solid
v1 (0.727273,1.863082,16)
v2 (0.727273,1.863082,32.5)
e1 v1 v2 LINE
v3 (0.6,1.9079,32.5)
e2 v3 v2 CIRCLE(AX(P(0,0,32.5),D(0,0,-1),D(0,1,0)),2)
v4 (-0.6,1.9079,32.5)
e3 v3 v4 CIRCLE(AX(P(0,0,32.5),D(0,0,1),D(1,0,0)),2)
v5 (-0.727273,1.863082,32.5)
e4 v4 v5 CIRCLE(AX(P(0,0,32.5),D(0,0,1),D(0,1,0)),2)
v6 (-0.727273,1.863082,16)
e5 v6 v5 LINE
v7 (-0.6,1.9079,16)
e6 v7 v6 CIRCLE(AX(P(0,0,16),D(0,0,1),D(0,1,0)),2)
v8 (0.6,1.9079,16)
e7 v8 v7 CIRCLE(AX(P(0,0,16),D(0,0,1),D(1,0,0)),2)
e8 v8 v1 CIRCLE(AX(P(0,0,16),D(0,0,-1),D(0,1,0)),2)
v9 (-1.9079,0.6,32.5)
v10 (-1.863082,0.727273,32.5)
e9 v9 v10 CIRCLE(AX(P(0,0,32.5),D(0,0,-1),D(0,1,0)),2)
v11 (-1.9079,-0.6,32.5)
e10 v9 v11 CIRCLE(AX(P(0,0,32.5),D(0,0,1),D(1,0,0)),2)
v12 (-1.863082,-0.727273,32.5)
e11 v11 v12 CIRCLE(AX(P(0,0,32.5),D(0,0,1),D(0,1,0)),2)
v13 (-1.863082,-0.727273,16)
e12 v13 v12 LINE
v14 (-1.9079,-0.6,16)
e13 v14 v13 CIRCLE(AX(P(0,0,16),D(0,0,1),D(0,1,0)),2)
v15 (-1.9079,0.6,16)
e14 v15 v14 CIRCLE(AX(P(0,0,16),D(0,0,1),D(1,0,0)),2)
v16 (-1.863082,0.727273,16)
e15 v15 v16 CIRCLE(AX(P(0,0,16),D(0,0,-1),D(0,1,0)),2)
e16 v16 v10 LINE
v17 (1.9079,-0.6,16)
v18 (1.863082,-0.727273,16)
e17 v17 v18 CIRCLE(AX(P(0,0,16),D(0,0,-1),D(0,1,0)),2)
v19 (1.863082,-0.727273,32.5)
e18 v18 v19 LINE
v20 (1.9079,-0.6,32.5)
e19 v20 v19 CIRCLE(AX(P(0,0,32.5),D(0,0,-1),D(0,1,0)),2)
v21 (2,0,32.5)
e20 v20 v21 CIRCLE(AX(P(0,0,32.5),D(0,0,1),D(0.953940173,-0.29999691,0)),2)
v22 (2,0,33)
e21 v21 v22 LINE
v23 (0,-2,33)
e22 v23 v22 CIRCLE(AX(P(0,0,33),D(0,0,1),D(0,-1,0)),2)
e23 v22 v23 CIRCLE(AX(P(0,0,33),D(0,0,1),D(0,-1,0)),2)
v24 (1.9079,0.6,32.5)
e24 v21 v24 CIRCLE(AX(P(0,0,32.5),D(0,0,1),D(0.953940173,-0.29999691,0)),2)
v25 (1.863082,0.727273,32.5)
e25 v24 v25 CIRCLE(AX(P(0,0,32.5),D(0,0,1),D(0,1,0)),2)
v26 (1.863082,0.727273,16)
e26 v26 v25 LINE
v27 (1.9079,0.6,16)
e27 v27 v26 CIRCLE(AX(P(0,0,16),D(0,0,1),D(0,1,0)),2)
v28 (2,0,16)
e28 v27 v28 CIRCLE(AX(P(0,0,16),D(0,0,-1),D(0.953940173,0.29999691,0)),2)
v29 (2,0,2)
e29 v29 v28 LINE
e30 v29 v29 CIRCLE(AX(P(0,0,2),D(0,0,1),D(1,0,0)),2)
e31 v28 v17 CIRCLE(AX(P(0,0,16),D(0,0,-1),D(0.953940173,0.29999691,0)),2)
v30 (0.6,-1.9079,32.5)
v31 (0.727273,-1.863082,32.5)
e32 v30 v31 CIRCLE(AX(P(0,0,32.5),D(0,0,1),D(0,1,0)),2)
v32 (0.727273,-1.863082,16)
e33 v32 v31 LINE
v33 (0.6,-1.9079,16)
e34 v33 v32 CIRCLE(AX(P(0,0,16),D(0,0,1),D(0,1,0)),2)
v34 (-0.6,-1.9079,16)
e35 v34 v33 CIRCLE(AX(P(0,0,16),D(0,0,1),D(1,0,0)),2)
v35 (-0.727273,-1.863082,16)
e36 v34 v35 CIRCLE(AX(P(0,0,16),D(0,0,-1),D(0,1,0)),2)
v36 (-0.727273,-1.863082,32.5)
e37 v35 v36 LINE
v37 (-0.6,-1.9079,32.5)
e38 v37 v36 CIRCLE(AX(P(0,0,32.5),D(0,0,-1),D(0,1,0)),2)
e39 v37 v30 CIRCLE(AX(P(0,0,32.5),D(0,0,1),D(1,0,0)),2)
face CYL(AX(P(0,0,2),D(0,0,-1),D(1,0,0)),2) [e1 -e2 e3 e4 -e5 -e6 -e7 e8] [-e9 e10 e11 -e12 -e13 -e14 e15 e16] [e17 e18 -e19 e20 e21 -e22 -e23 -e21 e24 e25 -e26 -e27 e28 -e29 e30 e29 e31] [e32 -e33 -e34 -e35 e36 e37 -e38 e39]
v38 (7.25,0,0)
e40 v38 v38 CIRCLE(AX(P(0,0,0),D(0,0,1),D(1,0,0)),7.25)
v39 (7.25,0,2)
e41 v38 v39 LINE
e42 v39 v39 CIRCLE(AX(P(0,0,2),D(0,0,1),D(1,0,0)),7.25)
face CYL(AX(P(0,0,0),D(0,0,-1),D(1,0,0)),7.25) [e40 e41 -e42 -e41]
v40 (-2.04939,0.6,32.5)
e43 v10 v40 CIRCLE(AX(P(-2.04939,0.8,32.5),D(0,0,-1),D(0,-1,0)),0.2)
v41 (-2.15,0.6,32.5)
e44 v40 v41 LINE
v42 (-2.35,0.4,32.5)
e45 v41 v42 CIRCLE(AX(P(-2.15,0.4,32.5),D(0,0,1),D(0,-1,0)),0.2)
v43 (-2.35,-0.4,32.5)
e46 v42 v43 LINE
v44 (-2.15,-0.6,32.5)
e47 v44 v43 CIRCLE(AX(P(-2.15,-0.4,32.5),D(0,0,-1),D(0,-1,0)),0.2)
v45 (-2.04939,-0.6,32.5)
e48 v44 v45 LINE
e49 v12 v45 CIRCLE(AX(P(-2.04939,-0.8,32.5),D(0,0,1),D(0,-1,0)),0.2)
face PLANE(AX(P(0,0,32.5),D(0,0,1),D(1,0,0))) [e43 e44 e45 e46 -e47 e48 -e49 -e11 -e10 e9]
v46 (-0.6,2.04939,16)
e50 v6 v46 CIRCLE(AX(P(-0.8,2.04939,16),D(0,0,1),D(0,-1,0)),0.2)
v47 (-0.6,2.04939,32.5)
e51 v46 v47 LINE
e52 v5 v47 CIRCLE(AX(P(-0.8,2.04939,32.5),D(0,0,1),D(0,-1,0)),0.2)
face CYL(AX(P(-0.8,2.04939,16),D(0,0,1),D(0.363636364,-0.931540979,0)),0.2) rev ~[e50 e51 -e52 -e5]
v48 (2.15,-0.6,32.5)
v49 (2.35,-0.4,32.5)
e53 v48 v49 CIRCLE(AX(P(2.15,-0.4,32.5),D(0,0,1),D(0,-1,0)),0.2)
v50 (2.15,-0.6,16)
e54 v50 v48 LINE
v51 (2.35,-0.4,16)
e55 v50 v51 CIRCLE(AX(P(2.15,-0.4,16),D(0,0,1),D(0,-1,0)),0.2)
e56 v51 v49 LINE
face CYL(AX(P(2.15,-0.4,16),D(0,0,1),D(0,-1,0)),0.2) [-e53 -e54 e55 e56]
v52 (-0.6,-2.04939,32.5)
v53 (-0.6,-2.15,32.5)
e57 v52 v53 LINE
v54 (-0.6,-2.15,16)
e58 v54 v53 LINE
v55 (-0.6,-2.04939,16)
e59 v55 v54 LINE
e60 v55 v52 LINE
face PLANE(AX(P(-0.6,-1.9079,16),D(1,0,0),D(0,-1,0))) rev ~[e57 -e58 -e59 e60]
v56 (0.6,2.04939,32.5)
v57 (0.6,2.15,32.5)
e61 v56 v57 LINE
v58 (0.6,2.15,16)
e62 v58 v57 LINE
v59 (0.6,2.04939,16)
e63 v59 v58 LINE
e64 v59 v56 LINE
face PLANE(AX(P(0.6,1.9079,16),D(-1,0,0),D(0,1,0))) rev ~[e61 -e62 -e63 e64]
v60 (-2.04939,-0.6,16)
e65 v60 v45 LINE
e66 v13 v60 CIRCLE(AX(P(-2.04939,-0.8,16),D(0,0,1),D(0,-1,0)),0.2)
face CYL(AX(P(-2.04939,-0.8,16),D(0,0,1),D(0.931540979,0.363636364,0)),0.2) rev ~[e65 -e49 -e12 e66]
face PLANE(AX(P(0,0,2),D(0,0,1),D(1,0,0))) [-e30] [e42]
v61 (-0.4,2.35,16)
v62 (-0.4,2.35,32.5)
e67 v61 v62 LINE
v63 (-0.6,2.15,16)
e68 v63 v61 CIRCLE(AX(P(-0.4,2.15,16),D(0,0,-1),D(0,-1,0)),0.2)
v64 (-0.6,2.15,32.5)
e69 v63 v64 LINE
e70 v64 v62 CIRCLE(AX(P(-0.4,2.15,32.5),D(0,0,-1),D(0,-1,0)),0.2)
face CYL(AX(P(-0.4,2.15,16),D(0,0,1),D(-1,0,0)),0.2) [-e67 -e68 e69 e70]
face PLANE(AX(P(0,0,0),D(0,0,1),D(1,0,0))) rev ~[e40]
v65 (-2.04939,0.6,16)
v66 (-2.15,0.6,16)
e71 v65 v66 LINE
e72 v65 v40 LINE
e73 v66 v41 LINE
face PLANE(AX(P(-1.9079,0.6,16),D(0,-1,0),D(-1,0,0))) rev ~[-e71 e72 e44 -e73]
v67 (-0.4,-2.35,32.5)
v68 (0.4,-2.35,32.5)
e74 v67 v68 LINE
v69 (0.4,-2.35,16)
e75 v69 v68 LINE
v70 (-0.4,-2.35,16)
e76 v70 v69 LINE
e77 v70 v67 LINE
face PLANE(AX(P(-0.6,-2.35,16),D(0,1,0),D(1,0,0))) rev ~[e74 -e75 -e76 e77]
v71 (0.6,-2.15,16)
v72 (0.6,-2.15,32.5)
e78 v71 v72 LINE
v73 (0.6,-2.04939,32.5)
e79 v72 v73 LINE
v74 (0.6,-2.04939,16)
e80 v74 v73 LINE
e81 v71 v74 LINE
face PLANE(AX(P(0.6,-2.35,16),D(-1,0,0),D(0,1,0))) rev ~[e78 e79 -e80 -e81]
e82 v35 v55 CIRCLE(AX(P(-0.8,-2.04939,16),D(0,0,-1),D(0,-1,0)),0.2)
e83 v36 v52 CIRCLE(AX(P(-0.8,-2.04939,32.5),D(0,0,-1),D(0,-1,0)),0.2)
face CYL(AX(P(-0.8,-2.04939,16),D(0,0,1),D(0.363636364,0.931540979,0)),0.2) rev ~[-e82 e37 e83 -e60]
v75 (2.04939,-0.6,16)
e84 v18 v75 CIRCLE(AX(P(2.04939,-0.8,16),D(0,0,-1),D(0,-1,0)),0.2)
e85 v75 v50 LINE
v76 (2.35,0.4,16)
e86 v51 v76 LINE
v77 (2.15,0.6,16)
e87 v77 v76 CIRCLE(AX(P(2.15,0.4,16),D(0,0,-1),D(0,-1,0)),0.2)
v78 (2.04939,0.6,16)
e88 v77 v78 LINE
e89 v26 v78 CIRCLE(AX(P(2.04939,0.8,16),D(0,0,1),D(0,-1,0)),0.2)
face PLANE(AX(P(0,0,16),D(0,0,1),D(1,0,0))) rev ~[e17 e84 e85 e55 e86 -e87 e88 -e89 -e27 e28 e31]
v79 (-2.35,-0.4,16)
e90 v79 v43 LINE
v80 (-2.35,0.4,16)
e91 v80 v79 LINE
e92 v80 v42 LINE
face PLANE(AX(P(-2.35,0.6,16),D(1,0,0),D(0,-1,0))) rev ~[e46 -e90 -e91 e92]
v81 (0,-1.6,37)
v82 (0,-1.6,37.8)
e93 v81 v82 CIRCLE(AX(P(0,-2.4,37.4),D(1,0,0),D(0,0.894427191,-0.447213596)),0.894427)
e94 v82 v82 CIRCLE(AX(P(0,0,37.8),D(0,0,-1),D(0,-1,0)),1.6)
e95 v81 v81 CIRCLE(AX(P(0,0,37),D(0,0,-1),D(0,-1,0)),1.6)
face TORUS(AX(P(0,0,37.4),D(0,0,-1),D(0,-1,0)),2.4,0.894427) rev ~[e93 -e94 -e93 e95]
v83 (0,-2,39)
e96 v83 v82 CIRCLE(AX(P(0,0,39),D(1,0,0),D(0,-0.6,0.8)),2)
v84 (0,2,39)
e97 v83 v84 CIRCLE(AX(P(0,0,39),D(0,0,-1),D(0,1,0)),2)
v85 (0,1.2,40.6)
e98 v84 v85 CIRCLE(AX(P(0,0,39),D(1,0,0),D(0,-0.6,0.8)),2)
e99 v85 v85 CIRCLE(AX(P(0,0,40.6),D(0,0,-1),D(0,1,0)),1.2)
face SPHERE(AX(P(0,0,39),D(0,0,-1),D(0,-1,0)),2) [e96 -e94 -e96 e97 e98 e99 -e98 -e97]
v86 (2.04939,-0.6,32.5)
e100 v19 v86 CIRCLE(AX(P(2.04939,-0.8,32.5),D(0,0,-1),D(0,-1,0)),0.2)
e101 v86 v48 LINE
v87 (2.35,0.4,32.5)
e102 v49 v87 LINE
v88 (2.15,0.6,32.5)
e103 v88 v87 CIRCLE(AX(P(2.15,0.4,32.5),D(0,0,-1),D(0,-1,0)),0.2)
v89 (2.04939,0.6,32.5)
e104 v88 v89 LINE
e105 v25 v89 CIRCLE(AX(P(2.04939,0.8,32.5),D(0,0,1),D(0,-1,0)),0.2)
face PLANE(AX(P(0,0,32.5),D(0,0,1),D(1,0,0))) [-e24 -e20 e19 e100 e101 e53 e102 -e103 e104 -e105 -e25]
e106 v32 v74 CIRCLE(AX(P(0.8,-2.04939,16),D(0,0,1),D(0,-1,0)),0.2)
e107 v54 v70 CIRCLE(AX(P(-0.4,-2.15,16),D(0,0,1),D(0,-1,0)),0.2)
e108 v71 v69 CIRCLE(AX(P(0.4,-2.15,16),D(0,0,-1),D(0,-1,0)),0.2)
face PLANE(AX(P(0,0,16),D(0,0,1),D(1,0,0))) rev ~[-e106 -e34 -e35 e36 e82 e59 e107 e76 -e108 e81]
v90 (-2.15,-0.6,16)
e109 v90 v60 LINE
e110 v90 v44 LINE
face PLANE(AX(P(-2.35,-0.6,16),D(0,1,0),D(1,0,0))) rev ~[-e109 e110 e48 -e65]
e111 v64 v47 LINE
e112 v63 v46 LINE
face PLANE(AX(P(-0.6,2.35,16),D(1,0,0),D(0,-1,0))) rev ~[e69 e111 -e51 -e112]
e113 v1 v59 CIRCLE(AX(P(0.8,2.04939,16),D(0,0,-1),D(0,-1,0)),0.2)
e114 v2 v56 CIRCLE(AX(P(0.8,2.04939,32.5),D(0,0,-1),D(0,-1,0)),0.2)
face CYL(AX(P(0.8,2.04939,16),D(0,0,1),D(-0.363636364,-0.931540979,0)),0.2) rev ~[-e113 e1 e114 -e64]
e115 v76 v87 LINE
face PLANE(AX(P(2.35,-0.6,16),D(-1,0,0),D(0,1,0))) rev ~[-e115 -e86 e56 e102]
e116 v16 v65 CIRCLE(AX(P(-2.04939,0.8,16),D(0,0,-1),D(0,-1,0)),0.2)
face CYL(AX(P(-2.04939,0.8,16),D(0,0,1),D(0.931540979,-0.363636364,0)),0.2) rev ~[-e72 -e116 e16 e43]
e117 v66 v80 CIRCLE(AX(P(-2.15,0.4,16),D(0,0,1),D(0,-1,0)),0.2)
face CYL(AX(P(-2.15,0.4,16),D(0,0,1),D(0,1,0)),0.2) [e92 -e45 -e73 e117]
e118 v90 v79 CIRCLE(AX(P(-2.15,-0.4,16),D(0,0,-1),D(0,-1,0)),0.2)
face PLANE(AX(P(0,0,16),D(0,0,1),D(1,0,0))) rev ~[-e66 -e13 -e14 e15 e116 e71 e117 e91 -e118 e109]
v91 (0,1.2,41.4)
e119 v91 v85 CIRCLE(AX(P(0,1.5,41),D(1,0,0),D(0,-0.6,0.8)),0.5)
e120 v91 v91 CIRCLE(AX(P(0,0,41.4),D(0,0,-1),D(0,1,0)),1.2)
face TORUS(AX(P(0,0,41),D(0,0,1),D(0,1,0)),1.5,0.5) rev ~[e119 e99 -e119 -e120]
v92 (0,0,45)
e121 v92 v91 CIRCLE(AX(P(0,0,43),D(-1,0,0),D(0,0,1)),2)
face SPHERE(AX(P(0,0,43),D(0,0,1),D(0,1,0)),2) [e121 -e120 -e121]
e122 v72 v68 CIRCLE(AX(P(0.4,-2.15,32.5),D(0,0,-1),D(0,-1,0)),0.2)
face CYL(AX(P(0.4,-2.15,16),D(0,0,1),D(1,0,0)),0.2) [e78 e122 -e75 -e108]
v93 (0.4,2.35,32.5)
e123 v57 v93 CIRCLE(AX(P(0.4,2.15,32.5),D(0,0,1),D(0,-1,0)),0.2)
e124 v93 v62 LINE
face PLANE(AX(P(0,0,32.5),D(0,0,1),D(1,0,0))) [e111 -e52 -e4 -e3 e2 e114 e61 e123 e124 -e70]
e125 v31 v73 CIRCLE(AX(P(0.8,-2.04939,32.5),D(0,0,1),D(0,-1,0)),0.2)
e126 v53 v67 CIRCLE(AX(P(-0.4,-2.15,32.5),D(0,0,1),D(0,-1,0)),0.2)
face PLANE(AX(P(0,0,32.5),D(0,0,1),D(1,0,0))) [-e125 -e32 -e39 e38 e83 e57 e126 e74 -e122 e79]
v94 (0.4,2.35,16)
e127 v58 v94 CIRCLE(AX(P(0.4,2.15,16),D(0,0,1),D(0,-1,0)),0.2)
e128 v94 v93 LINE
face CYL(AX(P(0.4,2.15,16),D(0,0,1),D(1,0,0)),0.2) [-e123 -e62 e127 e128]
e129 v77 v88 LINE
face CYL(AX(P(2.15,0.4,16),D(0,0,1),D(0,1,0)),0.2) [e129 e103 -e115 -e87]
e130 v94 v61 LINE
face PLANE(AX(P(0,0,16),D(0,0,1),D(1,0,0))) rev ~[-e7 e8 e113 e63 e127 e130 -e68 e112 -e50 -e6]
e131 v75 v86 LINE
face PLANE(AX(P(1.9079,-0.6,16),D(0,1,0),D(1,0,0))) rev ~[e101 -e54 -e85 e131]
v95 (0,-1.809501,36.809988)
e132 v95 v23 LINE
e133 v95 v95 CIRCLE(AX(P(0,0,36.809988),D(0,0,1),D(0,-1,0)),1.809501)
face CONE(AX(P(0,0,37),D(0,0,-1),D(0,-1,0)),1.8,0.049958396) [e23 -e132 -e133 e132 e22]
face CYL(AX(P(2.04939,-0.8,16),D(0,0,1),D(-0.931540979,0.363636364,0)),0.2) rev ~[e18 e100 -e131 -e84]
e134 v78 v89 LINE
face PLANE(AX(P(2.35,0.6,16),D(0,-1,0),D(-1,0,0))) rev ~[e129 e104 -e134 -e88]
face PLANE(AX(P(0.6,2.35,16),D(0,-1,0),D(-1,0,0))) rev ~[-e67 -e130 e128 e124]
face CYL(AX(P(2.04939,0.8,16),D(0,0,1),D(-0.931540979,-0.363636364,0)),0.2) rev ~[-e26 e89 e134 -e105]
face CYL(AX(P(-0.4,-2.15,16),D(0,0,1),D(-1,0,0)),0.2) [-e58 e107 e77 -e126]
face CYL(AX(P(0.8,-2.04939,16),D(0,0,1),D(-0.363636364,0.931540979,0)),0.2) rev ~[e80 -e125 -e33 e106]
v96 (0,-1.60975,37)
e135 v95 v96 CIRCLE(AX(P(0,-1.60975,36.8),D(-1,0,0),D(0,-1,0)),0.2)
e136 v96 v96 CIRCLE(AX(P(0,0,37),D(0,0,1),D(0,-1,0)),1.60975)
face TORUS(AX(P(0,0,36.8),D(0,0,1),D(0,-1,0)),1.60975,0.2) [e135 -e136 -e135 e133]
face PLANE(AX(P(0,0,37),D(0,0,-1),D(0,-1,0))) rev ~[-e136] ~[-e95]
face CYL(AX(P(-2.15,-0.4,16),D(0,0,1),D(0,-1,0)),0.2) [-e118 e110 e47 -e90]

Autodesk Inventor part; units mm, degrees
ref_plane "YZ Plane" through (0, 0, 0) normal (1, 0, 0) x (0, 1, 0)
ref_plane "XZ Plane" through (0, 0, 0) normal (0, 1, 0) x (-1, 0, 0)
sketch "Boceto1" plane through (0, 0, 0) normal (0, 0, 1) x (1, 0, 0)
  circle A0 centre (0, 0) radius 7.25
  dimension "d0" = 14.5
extrude "Extrusión1" add sketch "Boceto1" along normal blind 2
sketch "Boceto2" plane through (0, 0, 2) normal (0, 0, 1) x (1, 0, 0)
  circle A0 centre (0, 0) radius 2
  dimension "d3" = 4
extrude "Extrusión2" add sketch "Boceto2" along normal blind 43
sketch "Boceto3" plane through (0, 0, 0) normal (1, 0, 0) x (0, 1, 0)
  line L0 (2, 45) -> (-2, 45) projected
  line L1 (-2, 2) -> (2, 2) projected
  line L2 (-2, 2) -> (-2, 45) projected
  line L3 (2, 45) -> (-2, 45)
  line L4 (-2, 45) -> (-2, 41)
  line L5 (2, 41) -> (2, 45)
  arc A0 (1.2, 41.4) -> (-1.2, 41.4) centre (0, 43) ccw
  line L6 (-2, 41) -> (-2, 37)
  line L7 (-1.8, 37) -> (1.8, 37)
  line L8 (2, 37) -> (2, 41)
  arc A1 (-1.2, 40.6) -> (1.2, 40.6) centre (0, 39) ccw
  line L9 (0, 45) -> (0, 0)
  arc A2 (1.2, 41.4) -> (1.2, 40.6) centre (1.5, 41) ccw
  arc A3 (-1.2, 40.6) -> (-1.2, 41.4) centre (-1.5, 41) ccw
  line L10 (2, 45) -> (-2, 45)
  line L11 (-2, 45) -> (-2, 37)
  line L12 (-1.8, 37) -> (1.8, 37)
  line L13 (2, 37) -> (2, 45)
  line L14 (1.8, 37) -> (1, 37)
  line L15 (-1.8, 37) -> (-1, 37)
  line L16 (0, 37) -> (1.6, 37)
  line L17 (2, 37) -> (2, 33)
  line L18 (0, 37) -> (1.8, 37)
  line L19 (1.8, 37) -> (2, 33)
  line L20 (0, 37) -> (-1.8, 37)
  line L21 (-1.8, 37) -> (-2, 33)
  arc A4 (1.6, 37.8) -> (1.6, 37) centre (2.4, 37.4) ccw
  arc A5 (-1.6, 37) -> (-1.6, 37.8) centre (-2.4, 37.4) ccw
  point P0 (-1.6, 37.8)
  point P1 (-2, 39)
  point P2 (2, 39)
  point P3 (2, 43)
  point P4 (0, 45)
  point P5 (-2, 43)
  dimension "d12" = 1.6
  dimension "d13" = 4
  dimension "d14" = 1.8
  dimension "d15" = 1.8
revolve "Revolución1" cut sketch "Boceto3" angle 360 about axis through (0, 0, 45) along (0, 0, -1) contours L5 A0 L0 | A0 L2 L0 | L5 L8 A1 A2 A0 | A0 A3 A1 L2 | A5 L7 L21 L2 A1 | A1 L8 L17 L19 L7 A4
fillet "Empalme1" radius 0.2 1 edges at (0, 1.8, 37)
ref_plane "Plano de trabajo1" through (0, 0, 16) normal (0, 0, 1) x (1, 0, 0)
sketch "Boceto4" plane through (0, 0, 16) normal (0, 0, 1) x (1, 0, 0)
  circle A0 centre (0, 0) radius 2 projected
  line L0 (0.6, 1.9079) -> (0.6, 2.35)
  line L1 (0.6, 2.35) -> (-0.6, 2.35)
  line L2 (-0.6, 2.35) -> (-0.6, 1.9079)
  line L3 (0, 2) -> (0.6, 2.35) construction
  line L4 (0, 2) -> (-0.6, 2.35) construction
  arc A1 (0.6, 1.9079) -> (-0.6, 1.9079) centre (0, 0) ccw
  line L5 (-2.35, 0.6) -> (-2.35, -0.6)
  line L6 (-2.35, -0.6) -> (-1.9079, -0.6)
  arc A2 (-1.9079, 0.6) -> (-1.9079, -0.6) centre (0, 0) ccw
  line L7 (-1.9079, 0.6) -> (-2.35, 0.6)
  line L8 (-0.6, -2.35) -> (0.6, -2.35)
  line L9 (0.6, -2.35) -> (0.6, -1.9079)
  arc A3 (-0.6, -1.9079) -> (0.6, -1.9079) centre (0, 0) ccw
  line L10 (-0.6, -1.9079) -> (-0.6, -2.35)
  line L11 (2.35, -0.6) -> (2.35, 0.6)
  line L12 (2.35, 0.6) -> (1.9079, 0.6)
  arc A4 (1.9079, -0.6) -> (1.9079, 0.6) centre (0, 0) ccw
  line L13 (1.9079, -0.6) -> (2.35, -0.6)
  point P0 (-2, 0)
  point P1 (0, -2)
  point P2 (2, 0)
  dimension "d20" = 1.2
  dimension "d24" = 360
extrude "Extrusión3" add sketch "Boceto4" along normal blind 16.5 contours A0 L12 L11 L13 | A0 L2 L1 L0 | L9 L8 L10 A0 | A0 L6 L5 L7
fillet "Empalme2" radius 0.2 16 edges at (-0.6, 2.35, 24.25) (0.6, 2.35, 24.25) (-0.6, 1.9079, 24.25) (0.6, 1.9079, 24.25) (1.9079, 0.6, 24.25) (2.35, 0.6, 24.25) (2.35, -0.6, 24.25) (1.9079, -0.6, 24.25) (0.6, -2.35, 24.25) (0.6, -1.9079, 24.25) (-0.6, -1.9079, 24.25) (-0.6, -2.35, 24.25) (-2.35, 0.6, 24.25) (-2.35, -0.6, 24.25) (-1.9079, -0.6, 24.25) (-1.9079, 0.6, 24.25)
properties material "Plástico ABS"
